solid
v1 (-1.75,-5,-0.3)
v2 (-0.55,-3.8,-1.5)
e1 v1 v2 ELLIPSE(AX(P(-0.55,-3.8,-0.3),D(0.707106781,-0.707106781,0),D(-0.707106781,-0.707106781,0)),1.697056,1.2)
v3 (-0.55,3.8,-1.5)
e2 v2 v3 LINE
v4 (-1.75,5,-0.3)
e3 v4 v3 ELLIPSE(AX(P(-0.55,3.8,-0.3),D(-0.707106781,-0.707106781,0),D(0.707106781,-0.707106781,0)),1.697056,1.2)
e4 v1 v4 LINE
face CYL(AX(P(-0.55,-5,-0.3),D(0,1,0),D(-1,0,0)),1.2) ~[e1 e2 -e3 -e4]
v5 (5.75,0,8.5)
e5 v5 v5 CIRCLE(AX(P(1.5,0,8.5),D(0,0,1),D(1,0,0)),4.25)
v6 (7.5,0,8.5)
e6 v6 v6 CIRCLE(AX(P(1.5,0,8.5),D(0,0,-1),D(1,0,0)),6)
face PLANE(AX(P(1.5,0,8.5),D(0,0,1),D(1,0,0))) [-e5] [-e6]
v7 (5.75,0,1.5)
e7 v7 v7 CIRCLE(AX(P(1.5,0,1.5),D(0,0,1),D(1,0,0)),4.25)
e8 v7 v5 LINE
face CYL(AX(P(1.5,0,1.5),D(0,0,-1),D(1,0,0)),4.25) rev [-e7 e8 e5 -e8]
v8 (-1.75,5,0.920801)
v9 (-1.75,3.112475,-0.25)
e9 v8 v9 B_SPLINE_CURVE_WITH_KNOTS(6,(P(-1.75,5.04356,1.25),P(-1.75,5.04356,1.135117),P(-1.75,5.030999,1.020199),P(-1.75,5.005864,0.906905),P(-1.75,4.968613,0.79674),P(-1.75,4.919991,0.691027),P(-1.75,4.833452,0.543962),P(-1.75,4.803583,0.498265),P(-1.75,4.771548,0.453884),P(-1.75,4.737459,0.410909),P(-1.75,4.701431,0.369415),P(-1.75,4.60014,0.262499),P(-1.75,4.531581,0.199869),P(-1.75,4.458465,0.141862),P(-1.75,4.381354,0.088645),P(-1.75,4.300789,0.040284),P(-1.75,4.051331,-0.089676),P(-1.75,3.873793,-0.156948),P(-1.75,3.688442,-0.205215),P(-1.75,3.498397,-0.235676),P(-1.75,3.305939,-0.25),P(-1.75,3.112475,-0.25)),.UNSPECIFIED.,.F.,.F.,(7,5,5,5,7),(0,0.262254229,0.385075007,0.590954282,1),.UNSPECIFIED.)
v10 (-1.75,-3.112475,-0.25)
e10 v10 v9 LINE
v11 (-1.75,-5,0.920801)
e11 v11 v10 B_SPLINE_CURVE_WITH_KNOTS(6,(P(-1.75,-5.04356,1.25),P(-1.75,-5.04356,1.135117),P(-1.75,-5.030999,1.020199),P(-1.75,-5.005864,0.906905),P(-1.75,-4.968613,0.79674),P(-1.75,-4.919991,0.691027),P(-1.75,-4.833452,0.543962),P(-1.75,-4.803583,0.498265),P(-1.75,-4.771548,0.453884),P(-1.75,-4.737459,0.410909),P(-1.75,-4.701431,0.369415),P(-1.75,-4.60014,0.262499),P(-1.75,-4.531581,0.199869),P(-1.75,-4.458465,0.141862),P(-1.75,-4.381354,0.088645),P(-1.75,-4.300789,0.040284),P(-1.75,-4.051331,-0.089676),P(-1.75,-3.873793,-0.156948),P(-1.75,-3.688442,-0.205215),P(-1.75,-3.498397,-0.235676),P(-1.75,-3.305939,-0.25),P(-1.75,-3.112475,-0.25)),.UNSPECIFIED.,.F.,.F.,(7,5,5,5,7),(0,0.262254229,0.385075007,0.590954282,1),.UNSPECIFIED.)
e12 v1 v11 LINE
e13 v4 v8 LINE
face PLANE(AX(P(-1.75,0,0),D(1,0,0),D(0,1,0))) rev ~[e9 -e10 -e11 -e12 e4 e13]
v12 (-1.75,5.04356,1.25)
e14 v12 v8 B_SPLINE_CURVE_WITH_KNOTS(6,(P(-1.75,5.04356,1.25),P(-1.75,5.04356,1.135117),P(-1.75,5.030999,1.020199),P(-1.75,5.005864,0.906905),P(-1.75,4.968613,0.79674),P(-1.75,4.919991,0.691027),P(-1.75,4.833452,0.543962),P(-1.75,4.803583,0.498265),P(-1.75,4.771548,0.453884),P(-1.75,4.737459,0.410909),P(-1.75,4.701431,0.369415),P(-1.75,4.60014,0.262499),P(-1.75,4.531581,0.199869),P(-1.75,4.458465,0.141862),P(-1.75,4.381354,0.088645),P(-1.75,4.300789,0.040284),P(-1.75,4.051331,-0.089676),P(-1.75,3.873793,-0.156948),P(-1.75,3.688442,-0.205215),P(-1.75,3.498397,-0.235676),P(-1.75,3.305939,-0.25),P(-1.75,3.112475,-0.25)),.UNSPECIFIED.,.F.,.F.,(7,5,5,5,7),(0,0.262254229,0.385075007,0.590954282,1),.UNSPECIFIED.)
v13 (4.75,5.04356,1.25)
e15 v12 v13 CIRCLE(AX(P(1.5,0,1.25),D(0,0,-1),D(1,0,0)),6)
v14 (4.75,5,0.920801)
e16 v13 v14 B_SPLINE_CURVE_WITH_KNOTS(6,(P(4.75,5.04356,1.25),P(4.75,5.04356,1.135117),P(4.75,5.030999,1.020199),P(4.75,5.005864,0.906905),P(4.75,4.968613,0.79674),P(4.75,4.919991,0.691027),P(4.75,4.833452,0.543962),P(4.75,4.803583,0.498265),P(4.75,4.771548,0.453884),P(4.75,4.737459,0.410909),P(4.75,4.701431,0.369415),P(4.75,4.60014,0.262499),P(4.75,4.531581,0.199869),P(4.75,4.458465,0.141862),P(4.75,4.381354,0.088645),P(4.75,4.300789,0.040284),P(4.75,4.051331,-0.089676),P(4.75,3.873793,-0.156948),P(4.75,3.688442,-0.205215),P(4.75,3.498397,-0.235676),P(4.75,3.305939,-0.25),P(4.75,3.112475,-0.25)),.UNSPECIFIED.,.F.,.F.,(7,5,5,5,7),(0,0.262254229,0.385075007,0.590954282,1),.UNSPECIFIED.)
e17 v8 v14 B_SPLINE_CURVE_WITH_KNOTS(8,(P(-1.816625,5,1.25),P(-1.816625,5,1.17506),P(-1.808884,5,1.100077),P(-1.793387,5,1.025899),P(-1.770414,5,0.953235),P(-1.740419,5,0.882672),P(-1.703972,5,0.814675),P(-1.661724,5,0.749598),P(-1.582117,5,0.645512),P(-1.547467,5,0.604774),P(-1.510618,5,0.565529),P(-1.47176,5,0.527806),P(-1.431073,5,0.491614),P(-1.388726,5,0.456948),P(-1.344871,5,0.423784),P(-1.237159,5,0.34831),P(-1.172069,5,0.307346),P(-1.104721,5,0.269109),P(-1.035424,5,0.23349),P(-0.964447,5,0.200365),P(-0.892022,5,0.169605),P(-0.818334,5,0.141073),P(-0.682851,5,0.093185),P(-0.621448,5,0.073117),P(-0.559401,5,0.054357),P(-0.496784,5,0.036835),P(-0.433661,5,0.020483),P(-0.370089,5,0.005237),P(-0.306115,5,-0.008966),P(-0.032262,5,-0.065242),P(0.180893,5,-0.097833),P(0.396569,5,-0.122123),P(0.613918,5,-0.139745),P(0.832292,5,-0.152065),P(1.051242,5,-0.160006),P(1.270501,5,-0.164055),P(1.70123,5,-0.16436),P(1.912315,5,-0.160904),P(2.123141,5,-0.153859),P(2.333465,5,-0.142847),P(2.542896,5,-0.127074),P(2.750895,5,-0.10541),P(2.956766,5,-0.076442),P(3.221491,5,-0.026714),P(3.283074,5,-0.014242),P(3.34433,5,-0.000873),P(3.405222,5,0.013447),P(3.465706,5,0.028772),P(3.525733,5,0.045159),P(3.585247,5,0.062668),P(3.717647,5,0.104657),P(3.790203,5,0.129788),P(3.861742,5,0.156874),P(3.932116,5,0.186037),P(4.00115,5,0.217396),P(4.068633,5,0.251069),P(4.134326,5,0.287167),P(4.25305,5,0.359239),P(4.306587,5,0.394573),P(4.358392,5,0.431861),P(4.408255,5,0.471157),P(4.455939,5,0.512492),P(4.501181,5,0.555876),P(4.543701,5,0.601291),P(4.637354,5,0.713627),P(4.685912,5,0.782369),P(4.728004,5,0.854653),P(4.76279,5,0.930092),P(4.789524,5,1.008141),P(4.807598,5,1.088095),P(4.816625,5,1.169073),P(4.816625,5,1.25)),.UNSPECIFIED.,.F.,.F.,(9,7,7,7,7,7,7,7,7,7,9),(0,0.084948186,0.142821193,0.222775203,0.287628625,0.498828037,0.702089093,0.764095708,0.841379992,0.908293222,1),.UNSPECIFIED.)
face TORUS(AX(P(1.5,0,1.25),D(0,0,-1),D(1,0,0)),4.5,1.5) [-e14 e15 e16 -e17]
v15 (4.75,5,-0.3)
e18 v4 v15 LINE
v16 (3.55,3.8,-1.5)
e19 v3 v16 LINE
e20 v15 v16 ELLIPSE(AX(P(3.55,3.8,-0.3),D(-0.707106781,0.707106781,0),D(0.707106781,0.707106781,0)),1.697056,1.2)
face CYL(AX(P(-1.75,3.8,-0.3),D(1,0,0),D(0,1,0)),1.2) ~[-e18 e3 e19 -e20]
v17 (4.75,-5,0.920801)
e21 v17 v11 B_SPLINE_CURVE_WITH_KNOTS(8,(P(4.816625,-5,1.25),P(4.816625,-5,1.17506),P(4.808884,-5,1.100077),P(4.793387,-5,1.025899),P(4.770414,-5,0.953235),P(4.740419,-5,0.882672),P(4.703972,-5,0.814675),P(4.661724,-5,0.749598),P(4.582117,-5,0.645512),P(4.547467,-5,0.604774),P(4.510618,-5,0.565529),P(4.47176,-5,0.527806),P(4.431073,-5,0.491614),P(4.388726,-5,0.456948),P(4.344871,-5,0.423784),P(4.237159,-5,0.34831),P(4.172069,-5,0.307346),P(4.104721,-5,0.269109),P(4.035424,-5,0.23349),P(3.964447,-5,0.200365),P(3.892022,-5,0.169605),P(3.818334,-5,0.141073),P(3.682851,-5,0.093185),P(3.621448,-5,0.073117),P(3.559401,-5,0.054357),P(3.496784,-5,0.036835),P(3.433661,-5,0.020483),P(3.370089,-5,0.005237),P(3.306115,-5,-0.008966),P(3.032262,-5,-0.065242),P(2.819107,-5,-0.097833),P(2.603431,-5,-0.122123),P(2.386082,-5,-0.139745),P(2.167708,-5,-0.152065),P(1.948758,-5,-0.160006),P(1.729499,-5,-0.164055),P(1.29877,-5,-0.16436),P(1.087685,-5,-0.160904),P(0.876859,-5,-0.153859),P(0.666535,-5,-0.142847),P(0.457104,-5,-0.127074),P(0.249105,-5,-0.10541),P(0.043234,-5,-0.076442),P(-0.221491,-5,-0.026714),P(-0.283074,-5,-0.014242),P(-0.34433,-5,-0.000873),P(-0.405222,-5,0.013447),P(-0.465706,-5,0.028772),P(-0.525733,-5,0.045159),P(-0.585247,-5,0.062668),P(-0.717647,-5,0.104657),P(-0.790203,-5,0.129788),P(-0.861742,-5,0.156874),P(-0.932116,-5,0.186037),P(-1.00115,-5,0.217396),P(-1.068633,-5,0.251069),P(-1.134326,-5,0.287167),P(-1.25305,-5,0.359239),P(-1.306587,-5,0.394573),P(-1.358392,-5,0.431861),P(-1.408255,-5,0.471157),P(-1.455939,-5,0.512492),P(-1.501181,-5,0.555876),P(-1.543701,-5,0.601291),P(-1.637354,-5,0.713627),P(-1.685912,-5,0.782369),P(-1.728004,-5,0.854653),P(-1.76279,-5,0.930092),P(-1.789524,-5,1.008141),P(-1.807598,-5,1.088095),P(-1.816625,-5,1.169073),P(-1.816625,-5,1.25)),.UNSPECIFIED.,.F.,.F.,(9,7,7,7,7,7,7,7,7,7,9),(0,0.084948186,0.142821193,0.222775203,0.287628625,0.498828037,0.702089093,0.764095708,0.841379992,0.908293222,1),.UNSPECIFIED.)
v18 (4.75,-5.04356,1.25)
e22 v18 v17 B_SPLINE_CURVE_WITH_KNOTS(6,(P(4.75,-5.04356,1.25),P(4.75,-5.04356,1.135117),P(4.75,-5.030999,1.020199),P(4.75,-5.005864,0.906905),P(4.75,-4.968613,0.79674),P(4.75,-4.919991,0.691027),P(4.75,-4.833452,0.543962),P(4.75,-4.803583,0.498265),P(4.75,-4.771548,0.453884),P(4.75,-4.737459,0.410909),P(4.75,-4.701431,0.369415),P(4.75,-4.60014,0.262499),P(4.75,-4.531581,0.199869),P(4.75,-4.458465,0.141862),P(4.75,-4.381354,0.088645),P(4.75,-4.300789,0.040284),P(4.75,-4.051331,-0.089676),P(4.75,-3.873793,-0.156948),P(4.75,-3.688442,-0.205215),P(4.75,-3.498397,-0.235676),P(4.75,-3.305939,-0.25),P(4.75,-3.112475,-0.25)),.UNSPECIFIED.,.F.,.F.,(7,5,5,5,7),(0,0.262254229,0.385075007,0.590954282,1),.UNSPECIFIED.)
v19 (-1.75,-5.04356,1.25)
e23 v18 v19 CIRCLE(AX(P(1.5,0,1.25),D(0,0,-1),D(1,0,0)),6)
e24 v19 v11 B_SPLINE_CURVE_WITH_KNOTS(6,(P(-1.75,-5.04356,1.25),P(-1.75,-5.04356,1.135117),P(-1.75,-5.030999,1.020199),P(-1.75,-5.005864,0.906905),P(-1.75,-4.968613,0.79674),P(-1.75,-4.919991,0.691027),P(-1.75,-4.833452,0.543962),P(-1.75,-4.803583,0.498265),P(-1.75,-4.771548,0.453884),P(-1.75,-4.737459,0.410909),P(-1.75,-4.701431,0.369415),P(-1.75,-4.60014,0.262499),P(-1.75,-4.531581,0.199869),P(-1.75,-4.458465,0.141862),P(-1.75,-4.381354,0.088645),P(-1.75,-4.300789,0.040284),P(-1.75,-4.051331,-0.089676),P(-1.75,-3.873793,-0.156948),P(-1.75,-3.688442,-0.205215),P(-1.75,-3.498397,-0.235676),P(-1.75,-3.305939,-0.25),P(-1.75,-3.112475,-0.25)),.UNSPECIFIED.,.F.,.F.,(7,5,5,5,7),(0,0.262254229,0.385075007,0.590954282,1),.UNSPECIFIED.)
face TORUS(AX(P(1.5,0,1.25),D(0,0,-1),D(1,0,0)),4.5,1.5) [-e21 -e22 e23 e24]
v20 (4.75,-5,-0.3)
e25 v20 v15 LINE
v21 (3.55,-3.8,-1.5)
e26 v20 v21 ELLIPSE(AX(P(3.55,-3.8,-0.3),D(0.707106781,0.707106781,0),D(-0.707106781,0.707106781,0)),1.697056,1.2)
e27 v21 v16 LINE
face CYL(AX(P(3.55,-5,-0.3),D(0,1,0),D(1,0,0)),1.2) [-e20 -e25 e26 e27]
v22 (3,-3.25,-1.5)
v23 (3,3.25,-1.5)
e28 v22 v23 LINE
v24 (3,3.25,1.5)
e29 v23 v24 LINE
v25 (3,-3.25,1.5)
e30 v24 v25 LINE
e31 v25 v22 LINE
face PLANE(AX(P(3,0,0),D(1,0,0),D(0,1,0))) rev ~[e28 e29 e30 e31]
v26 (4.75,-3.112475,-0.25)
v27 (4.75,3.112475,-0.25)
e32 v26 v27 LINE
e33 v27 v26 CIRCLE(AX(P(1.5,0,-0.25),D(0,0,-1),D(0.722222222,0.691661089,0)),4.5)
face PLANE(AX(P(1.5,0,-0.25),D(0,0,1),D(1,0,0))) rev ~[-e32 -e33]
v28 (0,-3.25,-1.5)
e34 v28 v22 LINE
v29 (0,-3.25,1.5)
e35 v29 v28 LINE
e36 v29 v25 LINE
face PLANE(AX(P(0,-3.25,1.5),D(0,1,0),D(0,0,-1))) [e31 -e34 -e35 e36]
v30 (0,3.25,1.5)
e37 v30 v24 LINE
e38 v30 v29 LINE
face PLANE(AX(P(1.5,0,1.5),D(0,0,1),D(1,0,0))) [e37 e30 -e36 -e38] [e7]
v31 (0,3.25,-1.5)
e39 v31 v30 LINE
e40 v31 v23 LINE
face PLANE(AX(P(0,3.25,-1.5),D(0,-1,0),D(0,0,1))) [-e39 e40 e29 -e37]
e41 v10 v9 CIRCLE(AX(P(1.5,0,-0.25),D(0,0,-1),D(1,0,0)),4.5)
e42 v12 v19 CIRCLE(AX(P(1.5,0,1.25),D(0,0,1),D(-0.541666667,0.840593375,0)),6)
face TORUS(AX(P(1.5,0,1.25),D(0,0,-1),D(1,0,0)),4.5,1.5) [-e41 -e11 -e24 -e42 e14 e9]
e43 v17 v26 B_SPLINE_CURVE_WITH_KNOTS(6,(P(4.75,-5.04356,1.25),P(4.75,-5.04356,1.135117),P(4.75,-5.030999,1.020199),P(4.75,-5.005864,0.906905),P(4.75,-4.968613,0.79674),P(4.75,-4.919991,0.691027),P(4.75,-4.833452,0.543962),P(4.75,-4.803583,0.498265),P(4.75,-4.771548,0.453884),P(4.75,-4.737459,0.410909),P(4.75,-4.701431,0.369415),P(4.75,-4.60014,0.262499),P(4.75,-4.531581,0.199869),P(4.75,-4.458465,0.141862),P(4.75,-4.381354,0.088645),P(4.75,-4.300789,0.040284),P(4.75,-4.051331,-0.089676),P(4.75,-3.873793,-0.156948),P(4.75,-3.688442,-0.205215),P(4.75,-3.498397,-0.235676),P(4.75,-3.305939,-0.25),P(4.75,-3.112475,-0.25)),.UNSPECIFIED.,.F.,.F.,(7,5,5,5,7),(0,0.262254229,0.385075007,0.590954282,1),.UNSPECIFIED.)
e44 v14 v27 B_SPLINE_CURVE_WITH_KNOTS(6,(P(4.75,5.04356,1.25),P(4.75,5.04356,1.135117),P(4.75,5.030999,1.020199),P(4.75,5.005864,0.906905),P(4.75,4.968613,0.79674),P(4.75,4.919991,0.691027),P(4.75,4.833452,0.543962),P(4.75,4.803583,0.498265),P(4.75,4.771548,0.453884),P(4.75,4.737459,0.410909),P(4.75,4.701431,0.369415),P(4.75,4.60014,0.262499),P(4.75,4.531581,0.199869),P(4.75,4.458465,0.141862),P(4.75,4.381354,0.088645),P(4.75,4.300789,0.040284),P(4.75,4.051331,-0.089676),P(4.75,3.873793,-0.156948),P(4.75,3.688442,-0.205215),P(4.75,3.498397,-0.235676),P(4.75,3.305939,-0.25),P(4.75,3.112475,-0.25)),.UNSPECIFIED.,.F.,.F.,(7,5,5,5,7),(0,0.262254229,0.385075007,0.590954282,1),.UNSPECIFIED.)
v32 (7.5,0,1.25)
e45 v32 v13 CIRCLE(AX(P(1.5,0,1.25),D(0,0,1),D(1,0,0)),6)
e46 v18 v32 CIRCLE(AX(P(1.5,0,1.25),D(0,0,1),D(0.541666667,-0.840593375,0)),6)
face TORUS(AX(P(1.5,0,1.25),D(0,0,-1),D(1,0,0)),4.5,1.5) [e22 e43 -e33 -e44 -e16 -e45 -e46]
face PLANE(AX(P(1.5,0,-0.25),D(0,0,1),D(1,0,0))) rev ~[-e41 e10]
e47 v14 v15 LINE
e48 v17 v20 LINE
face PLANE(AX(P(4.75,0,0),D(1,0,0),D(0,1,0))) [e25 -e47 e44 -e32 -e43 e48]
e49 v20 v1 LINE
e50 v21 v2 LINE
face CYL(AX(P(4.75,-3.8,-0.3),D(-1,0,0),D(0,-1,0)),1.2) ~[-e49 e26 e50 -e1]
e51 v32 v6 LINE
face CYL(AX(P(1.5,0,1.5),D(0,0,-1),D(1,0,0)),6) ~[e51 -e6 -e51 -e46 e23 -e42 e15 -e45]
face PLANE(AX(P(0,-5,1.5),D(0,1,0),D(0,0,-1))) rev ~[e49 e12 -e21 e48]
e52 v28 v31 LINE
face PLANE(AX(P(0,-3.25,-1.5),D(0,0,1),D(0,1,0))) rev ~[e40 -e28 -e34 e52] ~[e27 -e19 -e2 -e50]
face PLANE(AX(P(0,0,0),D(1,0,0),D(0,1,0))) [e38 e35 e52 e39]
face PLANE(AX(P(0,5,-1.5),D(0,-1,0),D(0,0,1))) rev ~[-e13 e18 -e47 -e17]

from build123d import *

# Parameters (mm, degrees)
F1_DEPTH = 3
F2_R     = 4.25
F3_DEPTH = 7
F4_T     = 1.75
F6_R     = 1.2


# Not quite as in the source:
# - a fillet or chamfer that OpenCascade refuses, or shapes differently, is made with other operations: its cross-section is extruded or revolved along the edge and cut away or added


with BuildPart() as f1:
    # F0 (on Right) → F1 (new body)
    with BuildSketch(Plane.YZ):
        Polygon((-3.25, -1.5), (3.25, -1.5), (3.25, 1.5), (0, 1.5), (-3.25, 1.5), align=None)
    extrude(amount=F1_DEPTH)

    # F2 (on face) → F3 (join)
    with BuildSketch(Plane.XY.offset(1.5)):
        with Locations((1.5, 0)):
            Circle(F2_R)
    extrude(amount=F3_DEPTH)

    # F4
    f4_openings = [f1.faces().sort_by_distance(p)[0] for p in [
        (1.5, 0, -1.5),
        (1.5, 0, 8.5),
    ]]
    offset(amount=F4_T, openings=f4_openings, kind=Kind.INTERSECTION)

    # F5: fillet of radius 1.5 on 1 edges, made by hand


with BuildPart() as f5_tool2:
    # F5_s3 → F5_t4 (revolve)
    with BuildSketch(Plane.XZ):
        with BuildLine():
            ThreePointArc((7.5, 1.25), (7.0606601718, 0.1893398282), (6, -0.25))
            Line((6, -0.25), (7.5, -0.25))
            Line((7.5, -0.25), (7.5, 1.25))
        make_face()
    revolve(axis=Axis((1.5, 0, -0.25), (0, 0, -1)))

    split(bisect_by=Plane.YZ.offset(4.75), keep=Keep.TOP)


with BuildPart() as f1_1:
    add(f1.part)

    # F5_t1: cut F5_tool2
    add(f5_tool2.part, mode=Mode.SUBTRACT)


with BuildPart() as f5_tool7:
    # F5_s8 → F5_t9 (revolve)
    with BuildSketch(Plane.XZ):
        with BuildLine():
            ThreePointArc((7.5, 1.25), (7.0606601718, 0.1893398282), (6, -0.25))
            Line((6, -0.25), (7.5, -0.25))
            Line((7.5, -0.25), (7.5, 1.25))
        make_face()
    revolve(axis=Axis((1.5, 0, -0.25), (0, 0, -1)))

    split(bisect_by=Plane.YZ.offset(-1.75), keep=Keep.BOTTOM)


with BuildPart() as f1_2:
    add(f1_1.part)

    # F5_t6: cut F5_tool7
    add(f5_tool7.part, mode=Mode.SUBTRACT)


with BuildPart() as f5_tool12:
    # F5_s13 → F5_t14 (revolve)
    with BuildSketch(Plane.XZ):
        with BuildLine():
            ThreePointArc((7.5, 1.25), (7.0606601718, 0.1893398282), (6, -0.25))
            Line((6, -0.25), (7.5, -0.25))
            Line((7.5, -0.25), (7.5, 1.25))
        make_face()
    revolve(axis=Axis((1.5, 0, -0.25), (0, 0, -1)))

    split(bisect_by=Plane.XZ.offset(5), keep=Keep.TOP)


with BuildPart() as f1_3:
    add(f1_2.part)

    # F5_t11: cut F5_tool12
    add(f5_tool12.part, mode=Mode.SUBTRACT)


with BuildPart() as f5_tool17:
    # F5_s18 → F5_t19 (revolve)
    with BuildSketch(Plane.XZ):
        with BuildLine():
            ThreePointArc((7.5, 1.25), (7.0606601718, 0.1893398282), (6, -0.25))
            Line((6, -0.25), (7.5, -0.25))
            Line((7.5, -0.25), (7.5, 1.25))
        make_face()
    revolve(axis=Axis((1.5, 0, -0.25), (0, 0, -1)))

    split(bisect_by=Plane.XZ.offset(-5), keep=Keep.BOTTOM)


with BuildPart() as f1_4:
    add(f1_3.part)

    # F5_t16: cut F5_tool17
    add(f5_tool17.part, mode=Mode.SUBTRACT)

    # F6
    f6_edges = [f1_4.edges().sort_by_distance(p)[0] for p in [
        (1.5, 5, -1.5),
        (4.75, 0, -1.5),
        (1.5, -5, -1.5),
        (-1.75, 0, -1.5),
    ]]
    fillet(f6_edges, radius=F6_R)


solid = f1_4.part
